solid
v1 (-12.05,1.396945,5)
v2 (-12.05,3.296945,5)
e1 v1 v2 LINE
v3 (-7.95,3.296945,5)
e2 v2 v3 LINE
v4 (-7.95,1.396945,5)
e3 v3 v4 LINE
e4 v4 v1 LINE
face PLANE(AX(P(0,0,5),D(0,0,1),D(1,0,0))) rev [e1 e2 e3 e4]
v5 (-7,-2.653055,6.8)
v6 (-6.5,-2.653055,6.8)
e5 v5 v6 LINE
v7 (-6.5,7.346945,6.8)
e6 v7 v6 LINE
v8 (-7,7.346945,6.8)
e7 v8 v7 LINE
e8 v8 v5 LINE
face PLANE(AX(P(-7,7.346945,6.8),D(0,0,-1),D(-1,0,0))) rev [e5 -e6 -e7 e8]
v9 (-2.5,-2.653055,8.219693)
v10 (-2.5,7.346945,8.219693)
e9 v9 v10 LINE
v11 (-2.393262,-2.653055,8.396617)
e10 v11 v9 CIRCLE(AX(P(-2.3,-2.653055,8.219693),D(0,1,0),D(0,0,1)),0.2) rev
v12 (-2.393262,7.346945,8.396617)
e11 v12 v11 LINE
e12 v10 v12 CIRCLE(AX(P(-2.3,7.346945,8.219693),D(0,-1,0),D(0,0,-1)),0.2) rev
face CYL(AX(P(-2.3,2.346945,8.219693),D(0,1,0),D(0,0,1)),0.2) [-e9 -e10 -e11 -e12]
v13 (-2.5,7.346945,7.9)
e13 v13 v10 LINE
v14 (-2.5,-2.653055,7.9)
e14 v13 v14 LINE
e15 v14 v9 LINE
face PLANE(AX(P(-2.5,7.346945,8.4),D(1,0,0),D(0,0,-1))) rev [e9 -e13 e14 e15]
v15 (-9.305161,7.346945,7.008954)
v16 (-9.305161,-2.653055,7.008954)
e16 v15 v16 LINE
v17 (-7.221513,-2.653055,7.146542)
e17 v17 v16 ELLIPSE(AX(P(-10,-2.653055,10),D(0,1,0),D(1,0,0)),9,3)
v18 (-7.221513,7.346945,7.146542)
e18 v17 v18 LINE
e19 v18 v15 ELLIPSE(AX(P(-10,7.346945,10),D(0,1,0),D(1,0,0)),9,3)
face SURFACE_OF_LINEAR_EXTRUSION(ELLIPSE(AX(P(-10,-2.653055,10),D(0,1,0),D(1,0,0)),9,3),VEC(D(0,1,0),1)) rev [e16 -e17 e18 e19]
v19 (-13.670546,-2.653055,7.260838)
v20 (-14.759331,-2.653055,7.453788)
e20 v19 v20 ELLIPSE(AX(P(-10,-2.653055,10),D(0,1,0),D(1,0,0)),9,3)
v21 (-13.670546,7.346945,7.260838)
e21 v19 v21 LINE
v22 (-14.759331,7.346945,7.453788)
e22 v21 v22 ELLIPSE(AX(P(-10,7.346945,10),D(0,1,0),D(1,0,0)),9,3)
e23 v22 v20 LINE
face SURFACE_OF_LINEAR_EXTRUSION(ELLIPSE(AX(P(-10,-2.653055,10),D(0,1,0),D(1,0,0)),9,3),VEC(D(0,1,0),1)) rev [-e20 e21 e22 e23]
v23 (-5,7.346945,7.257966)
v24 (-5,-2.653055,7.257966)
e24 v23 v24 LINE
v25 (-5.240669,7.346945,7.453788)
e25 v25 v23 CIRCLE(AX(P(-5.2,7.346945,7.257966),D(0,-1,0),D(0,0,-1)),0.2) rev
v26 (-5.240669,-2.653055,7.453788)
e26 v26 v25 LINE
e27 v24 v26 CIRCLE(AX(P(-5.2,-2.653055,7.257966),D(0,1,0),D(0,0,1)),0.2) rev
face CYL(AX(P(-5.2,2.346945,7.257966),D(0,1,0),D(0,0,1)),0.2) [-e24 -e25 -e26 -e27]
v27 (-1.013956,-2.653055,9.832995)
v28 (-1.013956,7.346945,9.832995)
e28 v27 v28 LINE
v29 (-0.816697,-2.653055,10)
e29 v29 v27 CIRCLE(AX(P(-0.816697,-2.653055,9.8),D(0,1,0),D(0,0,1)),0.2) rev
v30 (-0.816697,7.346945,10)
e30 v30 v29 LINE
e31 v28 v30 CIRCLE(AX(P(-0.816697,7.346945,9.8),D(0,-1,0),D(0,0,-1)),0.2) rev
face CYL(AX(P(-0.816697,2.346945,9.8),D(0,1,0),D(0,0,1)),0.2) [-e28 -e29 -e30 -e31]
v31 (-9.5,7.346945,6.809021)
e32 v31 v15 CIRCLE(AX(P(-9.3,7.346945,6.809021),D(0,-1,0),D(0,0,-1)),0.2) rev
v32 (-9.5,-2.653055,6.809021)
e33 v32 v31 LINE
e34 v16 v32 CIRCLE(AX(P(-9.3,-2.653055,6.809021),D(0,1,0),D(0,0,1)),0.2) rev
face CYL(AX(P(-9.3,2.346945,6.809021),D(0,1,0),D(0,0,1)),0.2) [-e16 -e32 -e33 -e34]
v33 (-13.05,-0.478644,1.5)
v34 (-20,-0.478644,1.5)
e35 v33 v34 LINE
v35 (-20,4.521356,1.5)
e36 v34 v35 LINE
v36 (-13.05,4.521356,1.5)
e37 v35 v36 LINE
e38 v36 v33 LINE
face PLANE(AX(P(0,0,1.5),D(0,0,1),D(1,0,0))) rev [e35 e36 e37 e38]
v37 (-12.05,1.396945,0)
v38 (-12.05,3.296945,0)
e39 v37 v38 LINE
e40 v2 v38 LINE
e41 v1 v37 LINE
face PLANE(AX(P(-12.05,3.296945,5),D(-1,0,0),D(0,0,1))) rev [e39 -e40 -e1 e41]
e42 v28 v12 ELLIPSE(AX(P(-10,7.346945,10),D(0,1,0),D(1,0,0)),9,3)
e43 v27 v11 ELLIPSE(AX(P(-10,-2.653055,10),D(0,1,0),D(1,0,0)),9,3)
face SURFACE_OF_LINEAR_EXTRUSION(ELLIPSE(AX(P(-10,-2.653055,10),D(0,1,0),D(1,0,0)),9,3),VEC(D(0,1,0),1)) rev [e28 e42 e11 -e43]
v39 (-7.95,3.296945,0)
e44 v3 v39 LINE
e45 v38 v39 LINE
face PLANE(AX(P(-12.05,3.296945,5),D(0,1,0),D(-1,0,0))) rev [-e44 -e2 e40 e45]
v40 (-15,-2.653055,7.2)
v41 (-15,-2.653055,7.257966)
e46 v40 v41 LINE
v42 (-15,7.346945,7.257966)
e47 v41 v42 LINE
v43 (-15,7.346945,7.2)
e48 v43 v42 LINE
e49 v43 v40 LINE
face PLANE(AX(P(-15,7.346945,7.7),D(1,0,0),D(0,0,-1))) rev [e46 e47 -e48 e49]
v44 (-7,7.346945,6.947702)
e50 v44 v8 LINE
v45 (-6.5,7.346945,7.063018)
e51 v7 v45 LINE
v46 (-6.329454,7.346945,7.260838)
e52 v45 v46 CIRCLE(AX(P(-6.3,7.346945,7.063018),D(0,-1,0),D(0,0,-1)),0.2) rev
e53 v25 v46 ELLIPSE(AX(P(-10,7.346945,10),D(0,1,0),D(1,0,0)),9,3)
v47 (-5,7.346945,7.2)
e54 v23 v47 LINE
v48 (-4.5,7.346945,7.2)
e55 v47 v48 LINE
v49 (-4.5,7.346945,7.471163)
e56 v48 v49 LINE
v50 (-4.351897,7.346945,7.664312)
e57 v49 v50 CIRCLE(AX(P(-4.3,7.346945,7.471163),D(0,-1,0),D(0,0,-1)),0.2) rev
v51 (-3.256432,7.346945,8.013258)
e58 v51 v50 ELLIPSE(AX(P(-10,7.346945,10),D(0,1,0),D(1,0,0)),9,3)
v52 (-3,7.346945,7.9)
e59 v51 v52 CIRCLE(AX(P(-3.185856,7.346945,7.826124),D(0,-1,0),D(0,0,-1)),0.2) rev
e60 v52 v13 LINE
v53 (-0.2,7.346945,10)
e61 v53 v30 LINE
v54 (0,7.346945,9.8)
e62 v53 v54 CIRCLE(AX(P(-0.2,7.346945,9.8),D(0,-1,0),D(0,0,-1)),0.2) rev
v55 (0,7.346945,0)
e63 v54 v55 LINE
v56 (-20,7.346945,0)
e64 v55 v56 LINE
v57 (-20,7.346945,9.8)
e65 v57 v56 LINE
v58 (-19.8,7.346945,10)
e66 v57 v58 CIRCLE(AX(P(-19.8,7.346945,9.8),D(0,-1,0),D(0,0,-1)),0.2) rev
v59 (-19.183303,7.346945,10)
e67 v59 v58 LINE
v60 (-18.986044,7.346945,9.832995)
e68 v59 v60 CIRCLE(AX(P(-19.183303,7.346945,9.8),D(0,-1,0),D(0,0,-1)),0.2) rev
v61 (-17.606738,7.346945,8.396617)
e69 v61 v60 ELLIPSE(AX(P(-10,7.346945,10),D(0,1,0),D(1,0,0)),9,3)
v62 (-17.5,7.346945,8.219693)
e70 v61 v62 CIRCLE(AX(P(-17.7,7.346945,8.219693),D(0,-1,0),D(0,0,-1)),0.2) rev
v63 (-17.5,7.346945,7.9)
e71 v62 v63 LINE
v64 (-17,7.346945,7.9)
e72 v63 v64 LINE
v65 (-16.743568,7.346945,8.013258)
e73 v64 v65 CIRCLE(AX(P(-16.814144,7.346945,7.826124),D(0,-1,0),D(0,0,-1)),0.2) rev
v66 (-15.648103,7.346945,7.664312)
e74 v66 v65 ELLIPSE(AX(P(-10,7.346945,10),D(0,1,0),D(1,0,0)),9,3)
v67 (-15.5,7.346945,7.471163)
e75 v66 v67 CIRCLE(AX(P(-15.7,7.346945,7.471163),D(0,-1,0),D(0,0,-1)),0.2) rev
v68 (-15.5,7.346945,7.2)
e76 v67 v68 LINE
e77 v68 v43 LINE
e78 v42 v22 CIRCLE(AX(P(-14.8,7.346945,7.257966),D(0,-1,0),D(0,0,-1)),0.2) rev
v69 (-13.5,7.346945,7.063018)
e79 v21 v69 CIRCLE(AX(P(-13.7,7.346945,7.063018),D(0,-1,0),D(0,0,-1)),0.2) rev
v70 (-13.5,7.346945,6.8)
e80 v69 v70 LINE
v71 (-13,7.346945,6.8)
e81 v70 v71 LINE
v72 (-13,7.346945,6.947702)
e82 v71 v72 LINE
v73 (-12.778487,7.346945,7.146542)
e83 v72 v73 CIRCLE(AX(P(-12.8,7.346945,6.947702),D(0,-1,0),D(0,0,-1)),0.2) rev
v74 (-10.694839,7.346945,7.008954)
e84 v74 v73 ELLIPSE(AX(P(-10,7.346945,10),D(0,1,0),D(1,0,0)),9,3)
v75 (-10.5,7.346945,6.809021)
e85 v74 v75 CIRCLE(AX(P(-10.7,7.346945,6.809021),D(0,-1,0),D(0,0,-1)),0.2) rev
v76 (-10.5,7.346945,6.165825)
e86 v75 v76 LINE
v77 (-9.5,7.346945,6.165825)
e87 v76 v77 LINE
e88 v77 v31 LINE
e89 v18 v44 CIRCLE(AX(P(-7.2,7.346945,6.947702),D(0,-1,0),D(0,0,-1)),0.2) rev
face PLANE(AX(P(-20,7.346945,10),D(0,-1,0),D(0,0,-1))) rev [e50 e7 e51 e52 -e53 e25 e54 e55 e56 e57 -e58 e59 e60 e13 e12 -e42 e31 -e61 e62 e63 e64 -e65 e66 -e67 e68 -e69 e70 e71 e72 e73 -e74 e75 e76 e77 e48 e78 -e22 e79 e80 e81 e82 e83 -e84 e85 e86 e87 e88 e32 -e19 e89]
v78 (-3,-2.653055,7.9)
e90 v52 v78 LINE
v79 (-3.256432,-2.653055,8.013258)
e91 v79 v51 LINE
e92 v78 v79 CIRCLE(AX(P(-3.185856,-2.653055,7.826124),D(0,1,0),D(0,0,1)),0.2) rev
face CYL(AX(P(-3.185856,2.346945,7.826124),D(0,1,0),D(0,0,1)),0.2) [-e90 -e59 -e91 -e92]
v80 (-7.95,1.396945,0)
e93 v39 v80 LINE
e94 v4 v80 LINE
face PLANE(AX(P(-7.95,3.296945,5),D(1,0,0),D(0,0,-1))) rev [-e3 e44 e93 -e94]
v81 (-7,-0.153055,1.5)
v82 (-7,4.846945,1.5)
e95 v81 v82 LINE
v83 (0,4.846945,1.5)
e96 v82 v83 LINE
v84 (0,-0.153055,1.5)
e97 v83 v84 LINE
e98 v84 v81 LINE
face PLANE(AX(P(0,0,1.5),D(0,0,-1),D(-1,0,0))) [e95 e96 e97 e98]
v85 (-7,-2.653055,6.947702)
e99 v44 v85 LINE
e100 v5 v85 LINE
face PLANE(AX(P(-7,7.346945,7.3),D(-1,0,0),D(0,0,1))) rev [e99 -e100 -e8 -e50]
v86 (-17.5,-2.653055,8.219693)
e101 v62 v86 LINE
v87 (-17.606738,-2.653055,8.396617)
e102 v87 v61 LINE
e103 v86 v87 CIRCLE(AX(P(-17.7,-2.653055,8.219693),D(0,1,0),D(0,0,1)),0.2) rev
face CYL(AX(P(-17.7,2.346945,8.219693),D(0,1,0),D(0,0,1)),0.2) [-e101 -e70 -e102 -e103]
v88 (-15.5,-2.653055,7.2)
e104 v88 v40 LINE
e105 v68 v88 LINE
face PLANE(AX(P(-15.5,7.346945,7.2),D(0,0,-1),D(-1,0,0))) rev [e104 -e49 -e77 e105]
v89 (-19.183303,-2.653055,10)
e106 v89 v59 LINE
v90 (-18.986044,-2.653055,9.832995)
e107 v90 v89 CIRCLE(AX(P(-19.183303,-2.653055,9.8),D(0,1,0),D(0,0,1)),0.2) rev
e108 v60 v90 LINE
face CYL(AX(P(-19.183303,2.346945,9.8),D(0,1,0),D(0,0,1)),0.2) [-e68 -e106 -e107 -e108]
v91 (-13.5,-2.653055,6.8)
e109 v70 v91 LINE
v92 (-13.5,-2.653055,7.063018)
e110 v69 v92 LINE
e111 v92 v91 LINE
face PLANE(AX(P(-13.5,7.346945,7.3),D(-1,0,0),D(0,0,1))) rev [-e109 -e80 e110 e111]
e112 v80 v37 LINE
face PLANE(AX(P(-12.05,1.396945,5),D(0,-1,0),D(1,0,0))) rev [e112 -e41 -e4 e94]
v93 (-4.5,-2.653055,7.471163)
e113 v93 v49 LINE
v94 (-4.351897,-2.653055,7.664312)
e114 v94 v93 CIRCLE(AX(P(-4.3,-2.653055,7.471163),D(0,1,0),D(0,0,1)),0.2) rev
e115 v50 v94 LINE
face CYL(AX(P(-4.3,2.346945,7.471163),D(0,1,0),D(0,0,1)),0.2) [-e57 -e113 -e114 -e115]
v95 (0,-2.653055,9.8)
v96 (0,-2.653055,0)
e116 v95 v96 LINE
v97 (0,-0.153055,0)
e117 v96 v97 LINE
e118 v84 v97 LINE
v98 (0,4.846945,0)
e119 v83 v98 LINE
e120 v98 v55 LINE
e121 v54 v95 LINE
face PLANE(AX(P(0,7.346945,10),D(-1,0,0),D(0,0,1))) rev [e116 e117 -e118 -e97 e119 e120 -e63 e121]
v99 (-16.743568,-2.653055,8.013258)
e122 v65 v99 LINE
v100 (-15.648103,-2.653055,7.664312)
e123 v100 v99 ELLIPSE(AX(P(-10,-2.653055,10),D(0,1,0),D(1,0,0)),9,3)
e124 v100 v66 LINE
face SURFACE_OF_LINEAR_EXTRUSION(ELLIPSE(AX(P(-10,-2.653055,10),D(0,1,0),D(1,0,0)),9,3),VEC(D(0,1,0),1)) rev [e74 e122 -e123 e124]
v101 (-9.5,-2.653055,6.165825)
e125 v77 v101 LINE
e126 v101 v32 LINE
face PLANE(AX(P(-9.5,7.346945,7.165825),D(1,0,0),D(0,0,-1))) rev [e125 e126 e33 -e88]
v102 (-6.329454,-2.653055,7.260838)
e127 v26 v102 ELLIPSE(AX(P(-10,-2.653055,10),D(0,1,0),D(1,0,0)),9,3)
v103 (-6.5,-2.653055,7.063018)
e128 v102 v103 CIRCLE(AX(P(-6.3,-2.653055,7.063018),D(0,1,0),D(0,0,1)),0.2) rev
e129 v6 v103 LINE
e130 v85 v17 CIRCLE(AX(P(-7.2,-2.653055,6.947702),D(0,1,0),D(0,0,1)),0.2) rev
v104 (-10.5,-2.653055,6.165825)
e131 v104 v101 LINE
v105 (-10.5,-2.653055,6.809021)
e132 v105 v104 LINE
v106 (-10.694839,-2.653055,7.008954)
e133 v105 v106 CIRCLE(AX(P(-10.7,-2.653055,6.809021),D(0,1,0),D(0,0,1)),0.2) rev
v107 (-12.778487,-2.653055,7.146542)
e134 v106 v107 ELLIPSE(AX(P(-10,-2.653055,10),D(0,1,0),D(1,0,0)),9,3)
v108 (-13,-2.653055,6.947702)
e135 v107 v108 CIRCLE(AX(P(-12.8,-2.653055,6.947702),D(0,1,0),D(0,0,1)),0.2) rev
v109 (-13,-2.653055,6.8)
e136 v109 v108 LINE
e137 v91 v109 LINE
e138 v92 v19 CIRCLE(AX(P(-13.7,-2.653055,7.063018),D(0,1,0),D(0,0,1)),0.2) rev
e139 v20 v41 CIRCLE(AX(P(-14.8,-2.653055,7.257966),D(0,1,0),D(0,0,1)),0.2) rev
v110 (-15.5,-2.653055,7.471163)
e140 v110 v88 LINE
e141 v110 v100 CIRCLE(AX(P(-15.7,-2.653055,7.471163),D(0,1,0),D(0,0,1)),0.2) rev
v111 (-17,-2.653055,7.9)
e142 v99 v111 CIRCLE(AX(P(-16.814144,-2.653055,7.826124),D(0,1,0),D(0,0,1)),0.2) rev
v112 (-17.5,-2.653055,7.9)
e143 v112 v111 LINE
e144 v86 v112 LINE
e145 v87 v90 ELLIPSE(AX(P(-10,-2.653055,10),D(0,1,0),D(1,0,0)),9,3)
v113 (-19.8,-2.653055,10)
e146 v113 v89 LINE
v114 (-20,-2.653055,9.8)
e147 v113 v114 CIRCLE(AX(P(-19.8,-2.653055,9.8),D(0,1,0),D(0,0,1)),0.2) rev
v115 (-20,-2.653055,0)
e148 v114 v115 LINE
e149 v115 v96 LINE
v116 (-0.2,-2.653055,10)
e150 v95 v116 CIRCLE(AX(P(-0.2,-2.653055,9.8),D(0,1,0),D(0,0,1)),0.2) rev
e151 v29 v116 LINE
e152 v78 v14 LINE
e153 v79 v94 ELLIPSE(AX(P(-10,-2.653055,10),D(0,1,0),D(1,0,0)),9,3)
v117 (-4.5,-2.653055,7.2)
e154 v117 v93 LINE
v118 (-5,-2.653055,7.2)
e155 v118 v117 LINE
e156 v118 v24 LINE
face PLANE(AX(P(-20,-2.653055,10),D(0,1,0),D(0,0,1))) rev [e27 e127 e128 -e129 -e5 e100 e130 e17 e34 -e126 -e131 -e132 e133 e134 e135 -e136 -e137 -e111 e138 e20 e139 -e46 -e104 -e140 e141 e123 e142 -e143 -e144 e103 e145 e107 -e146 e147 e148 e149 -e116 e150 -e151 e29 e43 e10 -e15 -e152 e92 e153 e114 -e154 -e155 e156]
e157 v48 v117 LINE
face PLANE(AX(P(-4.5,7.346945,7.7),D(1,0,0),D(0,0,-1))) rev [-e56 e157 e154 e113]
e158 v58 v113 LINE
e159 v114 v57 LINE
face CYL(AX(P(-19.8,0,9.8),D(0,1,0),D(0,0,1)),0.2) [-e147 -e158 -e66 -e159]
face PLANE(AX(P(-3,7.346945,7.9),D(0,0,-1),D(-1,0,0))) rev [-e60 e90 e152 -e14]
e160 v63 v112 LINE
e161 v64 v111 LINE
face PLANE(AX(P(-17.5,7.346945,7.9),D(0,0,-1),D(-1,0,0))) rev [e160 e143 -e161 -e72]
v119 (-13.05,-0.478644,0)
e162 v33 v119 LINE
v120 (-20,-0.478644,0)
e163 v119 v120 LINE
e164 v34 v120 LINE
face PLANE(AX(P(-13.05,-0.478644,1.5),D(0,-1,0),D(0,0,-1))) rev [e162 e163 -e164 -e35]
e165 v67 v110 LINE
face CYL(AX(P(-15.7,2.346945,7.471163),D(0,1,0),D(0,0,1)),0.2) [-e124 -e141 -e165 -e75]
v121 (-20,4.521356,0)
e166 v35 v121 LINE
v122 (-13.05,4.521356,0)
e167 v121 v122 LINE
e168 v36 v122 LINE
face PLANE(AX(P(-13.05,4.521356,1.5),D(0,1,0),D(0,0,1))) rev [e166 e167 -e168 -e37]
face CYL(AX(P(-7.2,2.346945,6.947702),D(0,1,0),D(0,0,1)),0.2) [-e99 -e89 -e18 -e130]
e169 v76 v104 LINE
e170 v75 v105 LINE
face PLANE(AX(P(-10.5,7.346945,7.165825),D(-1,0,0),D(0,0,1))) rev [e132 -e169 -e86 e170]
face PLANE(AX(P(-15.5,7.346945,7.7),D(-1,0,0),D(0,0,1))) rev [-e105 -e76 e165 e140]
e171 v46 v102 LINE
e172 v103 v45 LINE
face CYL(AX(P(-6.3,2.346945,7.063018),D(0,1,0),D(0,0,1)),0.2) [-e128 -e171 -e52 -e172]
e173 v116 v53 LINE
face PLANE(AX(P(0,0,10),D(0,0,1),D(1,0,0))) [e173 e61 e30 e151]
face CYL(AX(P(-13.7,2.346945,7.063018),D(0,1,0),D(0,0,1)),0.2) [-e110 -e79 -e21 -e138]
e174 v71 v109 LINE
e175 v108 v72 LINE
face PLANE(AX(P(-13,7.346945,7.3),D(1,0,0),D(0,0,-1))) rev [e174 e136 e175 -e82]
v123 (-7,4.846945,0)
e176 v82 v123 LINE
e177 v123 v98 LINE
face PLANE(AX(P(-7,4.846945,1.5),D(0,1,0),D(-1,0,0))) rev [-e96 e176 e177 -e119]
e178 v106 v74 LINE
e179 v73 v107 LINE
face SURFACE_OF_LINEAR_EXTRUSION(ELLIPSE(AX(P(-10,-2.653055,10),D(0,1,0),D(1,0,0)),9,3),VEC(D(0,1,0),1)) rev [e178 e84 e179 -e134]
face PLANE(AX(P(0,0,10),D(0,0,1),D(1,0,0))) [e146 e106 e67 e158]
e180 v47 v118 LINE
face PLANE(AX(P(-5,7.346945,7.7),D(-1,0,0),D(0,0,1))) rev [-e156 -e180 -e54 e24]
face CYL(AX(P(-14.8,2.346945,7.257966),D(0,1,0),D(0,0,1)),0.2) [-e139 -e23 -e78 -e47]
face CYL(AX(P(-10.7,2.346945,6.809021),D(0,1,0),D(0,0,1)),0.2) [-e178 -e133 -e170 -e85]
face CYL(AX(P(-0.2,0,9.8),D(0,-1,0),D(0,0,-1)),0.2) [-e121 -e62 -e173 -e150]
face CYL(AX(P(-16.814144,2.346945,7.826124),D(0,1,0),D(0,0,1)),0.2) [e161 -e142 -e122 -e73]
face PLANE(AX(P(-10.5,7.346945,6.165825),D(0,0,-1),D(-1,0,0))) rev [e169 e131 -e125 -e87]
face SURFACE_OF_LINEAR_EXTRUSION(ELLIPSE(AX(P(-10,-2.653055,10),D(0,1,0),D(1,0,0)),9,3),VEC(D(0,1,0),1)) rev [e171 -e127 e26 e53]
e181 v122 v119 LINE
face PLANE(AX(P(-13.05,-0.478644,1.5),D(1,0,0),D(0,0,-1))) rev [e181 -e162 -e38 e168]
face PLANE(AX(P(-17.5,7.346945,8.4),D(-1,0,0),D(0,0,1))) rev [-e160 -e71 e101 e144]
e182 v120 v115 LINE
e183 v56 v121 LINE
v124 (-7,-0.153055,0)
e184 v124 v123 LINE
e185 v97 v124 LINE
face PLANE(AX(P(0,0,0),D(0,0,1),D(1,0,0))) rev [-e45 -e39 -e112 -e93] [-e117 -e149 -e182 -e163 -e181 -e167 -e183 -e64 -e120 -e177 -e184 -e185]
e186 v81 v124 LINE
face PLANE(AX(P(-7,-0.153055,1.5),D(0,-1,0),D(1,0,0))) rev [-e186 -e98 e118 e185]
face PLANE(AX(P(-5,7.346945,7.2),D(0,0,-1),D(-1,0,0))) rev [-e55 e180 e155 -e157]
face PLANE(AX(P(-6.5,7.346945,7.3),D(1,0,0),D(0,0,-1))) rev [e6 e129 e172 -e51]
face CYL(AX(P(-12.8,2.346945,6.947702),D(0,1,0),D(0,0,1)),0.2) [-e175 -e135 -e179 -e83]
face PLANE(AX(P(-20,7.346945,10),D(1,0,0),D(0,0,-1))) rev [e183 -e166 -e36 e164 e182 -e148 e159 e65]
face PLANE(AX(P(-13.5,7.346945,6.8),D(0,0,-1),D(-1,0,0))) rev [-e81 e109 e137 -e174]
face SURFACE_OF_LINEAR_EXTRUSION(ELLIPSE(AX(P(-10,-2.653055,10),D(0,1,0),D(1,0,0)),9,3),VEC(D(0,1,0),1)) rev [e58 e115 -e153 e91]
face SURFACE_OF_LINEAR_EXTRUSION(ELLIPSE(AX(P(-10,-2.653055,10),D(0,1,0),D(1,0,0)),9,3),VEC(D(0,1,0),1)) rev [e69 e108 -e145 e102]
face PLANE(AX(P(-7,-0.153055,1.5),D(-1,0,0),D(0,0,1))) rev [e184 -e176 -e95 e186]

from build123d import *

# Parameters (mm, degrees)
SKIZZE1_W                       = 20
SKIZZE1_H                       = 10
AUFSATZ_LINEAR_AUSTRAGEN1_DEPTH = 10
SKIZZE3_W                       = 4.1
SKIZZE3_H                       = 1.9
SCHNITT_LINEAR_AUSTRAGEN2_DEPTH = 5
SKIZZE9_RX                      = 9
SKIZZE9_RY                      = 3
SCHNITT_LINEAR_AUSTRAGEN3_DEPTH = 10
SKIZZE10_W                      = 6.95
SKIZZE10_H                      = 5
SCHNITT_LINEAR_AUSTRAGEN4_DEPTH = 1.5
SKIZZE11_W                      = 7
SKIZZE11_H                      = 5
SCHNITT_LINEAR_AUSTRAGEN5_DEPTH = 1.5
SKIZZE13_W                      = 1
SKIZZE13_H                      = 1
SCHNITT_LINEAR_AUSTRAGEN7_DEPTH = 10
SKIZZE14_W                      = 0.5
SKIZZE14_H                      = 0.5
SCHNITT_LINEAR_AUSTRAGEN8_DEPTH = 10
VERRUNDUNG2_R                   = 0.2
VERRUNDUNG3_R                   = 0.2
VERRUNDUNG4_R                   = 0.2
VERRUNDUNG5_R                   = 0.2
VERRUNDUNG6_R                   = 0.2


with BuildPart() as part:
    # Skizze1 → Aufsatz-Linear austragen1 (new body)
    with BuildSketch(Plane.XY):
        with Locations((-10, 2.346944746)):
            Rectangle(SKIZZE1_W, SKIZZE1_H)
    extrude(amount=AUFSATZ_LINEAR_AUSTRAGEN1_DEPTH)

    # Skizze3 → Schnitt-Linear austragen2 (cut)
    with BuildSketch(Plane(origin=(0, 0, 0), x_dir=(-1, 0, 0), z_dir=(0, 0, -1))):
        with Locations((10, 2.346944746)):
            Rectangle(SKIZZE3_W, SKIZZE3_H)
    extrude(amount=-SCHNITT_LINEAR_AUSTRAGEN2_DEPTH, mode=Mode.SUBTRACT)

    # Skizze9 → Schnitt-Linear austragen3 (cut)
    with BuildSketch(Plane(origin=(0, 7.346944746, 0), x_dir=(1, 0, 0), z_dir=(0, 1, 0))):
        with Locations((-10, -10)):
            Ellipse(SKIZZE9_RX, SKIZZE9_RY)
    extrude(amount=-SCHNITT_LINEAR_AUSTRAGEN3_DEPTH, mode=Mode.SUBTRACT)

    # Skizze10 → Schnitt-Linear austragen4 (cut)
    with BuildSketch(Plane(origin=(0, 0, 0), x_dir=(-1, 0, 0), z_dir=(0, 0, -1))):
        with Locations((16.525, 2.021356222)):
            Rectangle(SKIZZE10_W, SKIZZE10_H)
    extrude(amount=-SCHNITT_LINEAR_AUSTRAGEN4_DEPTH, mode=Mode.SUBTRACT)

    # Skizze11 → Schnitt-Linear austragen5 (cut)
    with BuildSketch(Plane(origin=(0, 0, 0), x_dir=(-1, 0, 0), z_dir=(0, 0, -1))):
        with Locations((3.5, 2.346944746)):
            Rectangle(SKIZZE11_W, SKIZZE11_H)
    extrude(amount=-SCHNITT_LINEAR_AUSTRAGEN5_DEPTH, mode=Mode.SUBTRACT)

    # Skizze13 → Schnitt-Linear austragen7 (cut)
    with BuildSketch(Plane.XZ.offset(2.653055254)):
        with Locations((-10, 6.665824705)):
            Rectangle(SKIZZE13_W, SKIZZE13_H)
    extrude(amount=-SCHNITT_LINEAR_AUSTRAGEN7_DEPTH, mode=Mode.SUBTRACT)

    # Skizze14 → Schnitt-Linear austragen8 (cut)
    with BuildSketch(Plane.XZ.offset(2.653055254)):
        with Locations((-15.25, 7.45)):
            Rectangle(SKIZZE14_W, SKIZZE14_H)
        with Locations((-4.75, 7.45)):
            Rectangle(SKIZZE14_W, SKIZZE14_H)
        with Locations((-13.25, 7.05)):
            Rectangle(SKIZZE14_W, SKIZZE14_H)
        with Locations((-2.75, 8.15)):
            Rectangle(SKIZZE14_W, SKIZZE14_H)
        with Locations((-17.25, 8.15)):
            Rectangle(SKIZZE14_W, SKIZZE14_H)
        with Locations((-6.75, 7.05)):
            Rectangle(SKIZZE14_W, SKIZZE14_H)
    extrude(amount=-SCHNITT_LINEAR_AUSTRAGEN8_DEPTH, mode=Mode.SUBTRACT)

    # Verrundung2
    verrundung2_edges = [part.edges().sort_by_distance(p)[0] for p in [
        (-13.5, 2.346944746, 7.236146008),
        (-15.5, 2.346944746, 7.625365525),
        (-17.5, 2.346944746, 8.341687605),
        (-19, 2.346944746, 10),
    ]]
    fillet(verrundung2_edges, radius=VERRUNDUNG2_R)

    # Verrundung3
    # the kernel refuses this fillet: 0.2 mm, written as the material it takes off along each edge
    with BuildSketch(Plane(origin=(-17, -3.342182333, 8.114381917), x_dir=(0.9302782404562213, 0, -0.3668547332850931), z_dir=(0, 1, 0))) as verrundung3_piece_1:
        with BuildLine():
            CenterArc((0.278646285, 0.199977567), VERRUNDUNG3_R, 180.155482176, 88.986351642)
            Line((0.078647021, 0.199434832), (0.074647036, 0.199423978))
            ThreePointArc((0.074647036, 0.199423978), (0.035602397, 0.101184835), (-0.003721113, 0.001467419))
            Line((-0.003721113, 0.001467419), (6.2365e-05, -0.003999514))
            ThreePointArc((6.2365e-05, -0.003999514), (0.137824964, -0.002947258), (0.275590922, -0.003999551))
            Line((0.275590922, -0.003999551), (0.275650831, 0))
        make_face()
    extrude(amount=11.378254157, mode=Mode.SUBTRACT)
    with BuildSketch(Plane(origin=(-15, -3.272043648, 7.505561742), x_dir=(0.9776339897126725, 0, -0.2103135329893973), z_dir=(0, 1, 0))) as verrundung3_piece_2:
        with BuildLine():
            CenterArc((0.247599452, 0.199994931), VERRUNDUNG3_R, 167.859273294, 101.732777732)
            Line((0.052072654, 0.242057637), (0.048162118, 0.242898891))
            Line((0.048162118, 0.242898891), (-0.003910536, 0.000841254))
            Line((-0.003910536, 0.000841254), (2.8981e-05, -0.003999895))
            ThreePointArc((2.8981e-05, -0.003999895), (0.123087615, -0.00355801), (0.246146974, -0.003999899))
            Line((0.246146974, -0.003999899), (0.246175454, 0))
        make_face()
    extrude(amount=11.237976787, mode=Mode.SUBTRACT)
    with BuildSketch(Plane(origin=(-13, -3.212731809, 7.171572875), x_dir=(0, 0, -1), z_dir=(0, 1, 0))) as verrundung3_piece_3:
        with BuildLine():
            CenterArc((0.223870622, -0.2), VERRUNDUNG3_R, 90, 96.174915405)
            Line((0.025030991, -0.221512819), (0.021054199, -0.221943076))
            ThreePointArc((0.021054199, -0.221943076), (0.008804856, -0.111175678), (-0.003972508, -0.000468165))
            Line((-0.003972508, -0.000468165), (0, 0.004))
            Line((0, 0.004), (0.223870622, 0.004))
            Line((0.223870622, 0.004), (0.223870622, 0))
        make_face()
    extrude(amount=11.119353109, mode=Mode.SUBTRACT)

    # Verrundung4
    # the kernel refuses this fillet: 0.2 mm, written as the material it takes off along each edge
    with BuildSketch(Plane(origin=(-1, 7.805203231, 10), x_dir=(1, 0, 0), z_dir=(0, -1, 0))) as verrundung4_piece_1:
        with BuildLine():
            CenterArc((0.183303394, -0.2), VERRUNDUNG4_R, 90, 80.504337422)
            Line((-0.013956225, -0.167005412), (-0.017901417, -0.16634552))
            ThreePointArc((-0.017901417, -0.16634552), (-0.007497365, -0.083459179), (-0.004, 0))
            Line((-0.004, 0), (0, 0.004))
            Line((0, 0.004), (0.183303394, 0.004))
            Line((0.183303394, 0.004), (0.183303394, 0))
        make_face()
    extrude(amount=10.91651697, mode=Mode.SUBTRACT)
    with BuildSketch(Plane(origin=(-7, -3.212731809, 7.171572875), x_dir=(0, 0, -1), z_dir=(0, 1, 0))) as verrundung4_piece_2:
        with BuildLine():
            CenterArc((0.223870622, 0.2), VERRUNDUNG4_R, 173.825084595, 96.174915405)
            Line((0.025030991, 0.221512819), (0.021054199, 0.221943076))
            ThreePointArc((0.021054199, 0.221943076), (0.008804856, 0.111175678), (-0.003972508, 0.000468165))
            Line((-0.003972508, 0.000468165), (0, -0.004))
            Line((0, -0.004), (0.223870622, -0.004))
            Line((0.223870622, -0.004), (0.223870622, 0))
        make_face()
    extrude(amount=11.119353109, mode=Mode.SUBTRACT)
    with BuildSketch(Plane(origin=(-3, -3.342182333, 8.114381917), x_dir=(0, 0, -1), z_dir=(0, 1, 0))) as verrundung4_piece_3:
        with BuildLine():
            CenterArc((0.288257487, 0.185855858), VERRUNDUNG4_R, 159.336395365, 88.986351642)
            Line((0.101123812, 0.25643197), (0.097381139, 0.257843493))
            ThreePointArc((0.097381139, 0.257843493), (0.04781997, 0.12929678), (-0.003697782, 0.001525257))
            Line((-0.003697782, 0.001525257), (0, -0.004))
            ThreePointArc((0, -0.004), (0.107190958, -0.004), (0.212904405, -0.003717117))
            Line((0.212904405, -0.003717117), (0.214381917, 0))
        make_face()
    extrude(amount=11.378254157, mode=Mode.SUBTRACT)
    with BuildSketch(Plane(origin=(-5, -3.272043648, 7.505561742), x_dir=(0, 0, -1), z_dir=(0, 1, 0))) as verrundung4_piece_4:
        with BuildLine():
            CenterArc((0.247595357, 0.2), VERRUNDUNG4_R, 168.267222268, 101.732777732)
            Line((0.051774029, 0.240669491), (0.047857603, 0.241482881))
            ThreePointArc((0.047857603, 0.241482881), (0.02240856, 0.121082934), (-0.003904338, 0.000869565))
            Line((-0.003904338, 0.000869565), (0, -0.004))
            Line((0, -0.004), (0.247595357, -0.004))
            Line((0.247595357, -0.004), (0.247595357, 0))
        make_face()
    extrude(amount=11.237976787, mode=Mode.SUBTRACT)
    with BuildSketch(Plane(origin=(-6.5, -3.085874245, 7.236146008), x_dir=(0.9896812974841964, 0, 0.1432861801081929), z_dir=(0, 1, 0))) as verrundung4_piece_5:
        with BuildLine():
            CenterArc((0.173129468, 0.19999838), VERRUNDUNG4_R, 188.238048246, 81.531348944)
            Line((-0.024806792, 0.171341144), (-0.028765517, 0.170767999))
            Line((-0.028765517, 0.170767999), (-0.003958725, -0.000573145))
            Line((-0.003958725, -0.000573145), (1.5974e-05, -0.003999968))
            ThreePointArc((1.5974e-05, -0.003999968), (0.086162287, -0.00382729), (0.172308415, -0.003999968))
            Line((0.172308415, -0.003999968), (0.172324514, 0))
        make_face()
    extrude(amount=10.865637981, mode=Mode.SUBTRACT)
    with BuildSketch(Plane(origin=(-4.5, -3.03856184, 7.625365525), x_dir=(0.9671190047653414, 0, 0.2543242627467847), z_dir=(0, 1, 0))) as verrundung4_piece_6:
        with BuildLine():
            CenterArc((0.15420633, 0.199997151), VERRUNDUNG4_R, 194.733548244, 74.960608015)
            Line((-0.039217471, 0.149132298), (-0.043085947, 0.148115001))
            Line((-0.043085947, 0.148115001), (-0.003868476, -0.001017297))
            Line((-0.003868476, -0.001017297), (2.106e-05, -0.003999945))
            ThreePointArc((2.106e-05, -0.003999945), (0.076569439, -0.003797048), (0.153117387, -0.003999943))
            Line((0.153117387, -0.003999943), (0.153138739, 0))
        make_face()
    extrude(amount=10.771013171, mode=Mode.SUBTRACT)
    with BuildSketch(Plane(origin=(-2.5, -2.958042767, 8.341687605), x_dir=(0.8891677006710952, 0, 0.45758146824721596), z_dir=(0, 1, 0))) as verrundung4_piece_7:
        with BuildLine():
            CenterArc((0.122010887, 0.199990312), VERRUNDUNG4_R, 207.231153848, 62.204893345)
            Line((-0.055822654, 0.108474018), (-0.059379324, 0.106643692))
            Line((-0.059379324, 0.106643692), (-0.003556671, -0.001830326))
            Line((-0.003556671, -0.001830326), (3.845e-05, -0.003999815))
            ThreePointArc((3.845e-05, -0.003999815), (0.060021389, -0.003708116), (0.120002981, -0.003999806))
            Line((0.120002981, -0.003999806), (0.120042352, 0))
        make_face()
    extrude(amount=10.609975026, mode=Mode.SUBTRACT)

    # Verrundung5
    verrundung5_edges = [part.edges().sort_by_distance(p)[0] for p in [
        (-9.5, 2.346944746, 7.004633207),
        (-10.5, 2.346944746, 7.004633207),
    ]]
    fillet(verrundung5_edges, radius=VERRUNDUNG5_R)

    # Verrundung6
    verrundung6_edges = [part.edges().sort_by_distance(p)[0] for p in [
        (-20, 2.346944746, 10),
        (0, 2.346944746, 10),
    ]]
    fillet(verrundung6_edges, radius=VERRUNDUNG6_R)


solid = part.part
